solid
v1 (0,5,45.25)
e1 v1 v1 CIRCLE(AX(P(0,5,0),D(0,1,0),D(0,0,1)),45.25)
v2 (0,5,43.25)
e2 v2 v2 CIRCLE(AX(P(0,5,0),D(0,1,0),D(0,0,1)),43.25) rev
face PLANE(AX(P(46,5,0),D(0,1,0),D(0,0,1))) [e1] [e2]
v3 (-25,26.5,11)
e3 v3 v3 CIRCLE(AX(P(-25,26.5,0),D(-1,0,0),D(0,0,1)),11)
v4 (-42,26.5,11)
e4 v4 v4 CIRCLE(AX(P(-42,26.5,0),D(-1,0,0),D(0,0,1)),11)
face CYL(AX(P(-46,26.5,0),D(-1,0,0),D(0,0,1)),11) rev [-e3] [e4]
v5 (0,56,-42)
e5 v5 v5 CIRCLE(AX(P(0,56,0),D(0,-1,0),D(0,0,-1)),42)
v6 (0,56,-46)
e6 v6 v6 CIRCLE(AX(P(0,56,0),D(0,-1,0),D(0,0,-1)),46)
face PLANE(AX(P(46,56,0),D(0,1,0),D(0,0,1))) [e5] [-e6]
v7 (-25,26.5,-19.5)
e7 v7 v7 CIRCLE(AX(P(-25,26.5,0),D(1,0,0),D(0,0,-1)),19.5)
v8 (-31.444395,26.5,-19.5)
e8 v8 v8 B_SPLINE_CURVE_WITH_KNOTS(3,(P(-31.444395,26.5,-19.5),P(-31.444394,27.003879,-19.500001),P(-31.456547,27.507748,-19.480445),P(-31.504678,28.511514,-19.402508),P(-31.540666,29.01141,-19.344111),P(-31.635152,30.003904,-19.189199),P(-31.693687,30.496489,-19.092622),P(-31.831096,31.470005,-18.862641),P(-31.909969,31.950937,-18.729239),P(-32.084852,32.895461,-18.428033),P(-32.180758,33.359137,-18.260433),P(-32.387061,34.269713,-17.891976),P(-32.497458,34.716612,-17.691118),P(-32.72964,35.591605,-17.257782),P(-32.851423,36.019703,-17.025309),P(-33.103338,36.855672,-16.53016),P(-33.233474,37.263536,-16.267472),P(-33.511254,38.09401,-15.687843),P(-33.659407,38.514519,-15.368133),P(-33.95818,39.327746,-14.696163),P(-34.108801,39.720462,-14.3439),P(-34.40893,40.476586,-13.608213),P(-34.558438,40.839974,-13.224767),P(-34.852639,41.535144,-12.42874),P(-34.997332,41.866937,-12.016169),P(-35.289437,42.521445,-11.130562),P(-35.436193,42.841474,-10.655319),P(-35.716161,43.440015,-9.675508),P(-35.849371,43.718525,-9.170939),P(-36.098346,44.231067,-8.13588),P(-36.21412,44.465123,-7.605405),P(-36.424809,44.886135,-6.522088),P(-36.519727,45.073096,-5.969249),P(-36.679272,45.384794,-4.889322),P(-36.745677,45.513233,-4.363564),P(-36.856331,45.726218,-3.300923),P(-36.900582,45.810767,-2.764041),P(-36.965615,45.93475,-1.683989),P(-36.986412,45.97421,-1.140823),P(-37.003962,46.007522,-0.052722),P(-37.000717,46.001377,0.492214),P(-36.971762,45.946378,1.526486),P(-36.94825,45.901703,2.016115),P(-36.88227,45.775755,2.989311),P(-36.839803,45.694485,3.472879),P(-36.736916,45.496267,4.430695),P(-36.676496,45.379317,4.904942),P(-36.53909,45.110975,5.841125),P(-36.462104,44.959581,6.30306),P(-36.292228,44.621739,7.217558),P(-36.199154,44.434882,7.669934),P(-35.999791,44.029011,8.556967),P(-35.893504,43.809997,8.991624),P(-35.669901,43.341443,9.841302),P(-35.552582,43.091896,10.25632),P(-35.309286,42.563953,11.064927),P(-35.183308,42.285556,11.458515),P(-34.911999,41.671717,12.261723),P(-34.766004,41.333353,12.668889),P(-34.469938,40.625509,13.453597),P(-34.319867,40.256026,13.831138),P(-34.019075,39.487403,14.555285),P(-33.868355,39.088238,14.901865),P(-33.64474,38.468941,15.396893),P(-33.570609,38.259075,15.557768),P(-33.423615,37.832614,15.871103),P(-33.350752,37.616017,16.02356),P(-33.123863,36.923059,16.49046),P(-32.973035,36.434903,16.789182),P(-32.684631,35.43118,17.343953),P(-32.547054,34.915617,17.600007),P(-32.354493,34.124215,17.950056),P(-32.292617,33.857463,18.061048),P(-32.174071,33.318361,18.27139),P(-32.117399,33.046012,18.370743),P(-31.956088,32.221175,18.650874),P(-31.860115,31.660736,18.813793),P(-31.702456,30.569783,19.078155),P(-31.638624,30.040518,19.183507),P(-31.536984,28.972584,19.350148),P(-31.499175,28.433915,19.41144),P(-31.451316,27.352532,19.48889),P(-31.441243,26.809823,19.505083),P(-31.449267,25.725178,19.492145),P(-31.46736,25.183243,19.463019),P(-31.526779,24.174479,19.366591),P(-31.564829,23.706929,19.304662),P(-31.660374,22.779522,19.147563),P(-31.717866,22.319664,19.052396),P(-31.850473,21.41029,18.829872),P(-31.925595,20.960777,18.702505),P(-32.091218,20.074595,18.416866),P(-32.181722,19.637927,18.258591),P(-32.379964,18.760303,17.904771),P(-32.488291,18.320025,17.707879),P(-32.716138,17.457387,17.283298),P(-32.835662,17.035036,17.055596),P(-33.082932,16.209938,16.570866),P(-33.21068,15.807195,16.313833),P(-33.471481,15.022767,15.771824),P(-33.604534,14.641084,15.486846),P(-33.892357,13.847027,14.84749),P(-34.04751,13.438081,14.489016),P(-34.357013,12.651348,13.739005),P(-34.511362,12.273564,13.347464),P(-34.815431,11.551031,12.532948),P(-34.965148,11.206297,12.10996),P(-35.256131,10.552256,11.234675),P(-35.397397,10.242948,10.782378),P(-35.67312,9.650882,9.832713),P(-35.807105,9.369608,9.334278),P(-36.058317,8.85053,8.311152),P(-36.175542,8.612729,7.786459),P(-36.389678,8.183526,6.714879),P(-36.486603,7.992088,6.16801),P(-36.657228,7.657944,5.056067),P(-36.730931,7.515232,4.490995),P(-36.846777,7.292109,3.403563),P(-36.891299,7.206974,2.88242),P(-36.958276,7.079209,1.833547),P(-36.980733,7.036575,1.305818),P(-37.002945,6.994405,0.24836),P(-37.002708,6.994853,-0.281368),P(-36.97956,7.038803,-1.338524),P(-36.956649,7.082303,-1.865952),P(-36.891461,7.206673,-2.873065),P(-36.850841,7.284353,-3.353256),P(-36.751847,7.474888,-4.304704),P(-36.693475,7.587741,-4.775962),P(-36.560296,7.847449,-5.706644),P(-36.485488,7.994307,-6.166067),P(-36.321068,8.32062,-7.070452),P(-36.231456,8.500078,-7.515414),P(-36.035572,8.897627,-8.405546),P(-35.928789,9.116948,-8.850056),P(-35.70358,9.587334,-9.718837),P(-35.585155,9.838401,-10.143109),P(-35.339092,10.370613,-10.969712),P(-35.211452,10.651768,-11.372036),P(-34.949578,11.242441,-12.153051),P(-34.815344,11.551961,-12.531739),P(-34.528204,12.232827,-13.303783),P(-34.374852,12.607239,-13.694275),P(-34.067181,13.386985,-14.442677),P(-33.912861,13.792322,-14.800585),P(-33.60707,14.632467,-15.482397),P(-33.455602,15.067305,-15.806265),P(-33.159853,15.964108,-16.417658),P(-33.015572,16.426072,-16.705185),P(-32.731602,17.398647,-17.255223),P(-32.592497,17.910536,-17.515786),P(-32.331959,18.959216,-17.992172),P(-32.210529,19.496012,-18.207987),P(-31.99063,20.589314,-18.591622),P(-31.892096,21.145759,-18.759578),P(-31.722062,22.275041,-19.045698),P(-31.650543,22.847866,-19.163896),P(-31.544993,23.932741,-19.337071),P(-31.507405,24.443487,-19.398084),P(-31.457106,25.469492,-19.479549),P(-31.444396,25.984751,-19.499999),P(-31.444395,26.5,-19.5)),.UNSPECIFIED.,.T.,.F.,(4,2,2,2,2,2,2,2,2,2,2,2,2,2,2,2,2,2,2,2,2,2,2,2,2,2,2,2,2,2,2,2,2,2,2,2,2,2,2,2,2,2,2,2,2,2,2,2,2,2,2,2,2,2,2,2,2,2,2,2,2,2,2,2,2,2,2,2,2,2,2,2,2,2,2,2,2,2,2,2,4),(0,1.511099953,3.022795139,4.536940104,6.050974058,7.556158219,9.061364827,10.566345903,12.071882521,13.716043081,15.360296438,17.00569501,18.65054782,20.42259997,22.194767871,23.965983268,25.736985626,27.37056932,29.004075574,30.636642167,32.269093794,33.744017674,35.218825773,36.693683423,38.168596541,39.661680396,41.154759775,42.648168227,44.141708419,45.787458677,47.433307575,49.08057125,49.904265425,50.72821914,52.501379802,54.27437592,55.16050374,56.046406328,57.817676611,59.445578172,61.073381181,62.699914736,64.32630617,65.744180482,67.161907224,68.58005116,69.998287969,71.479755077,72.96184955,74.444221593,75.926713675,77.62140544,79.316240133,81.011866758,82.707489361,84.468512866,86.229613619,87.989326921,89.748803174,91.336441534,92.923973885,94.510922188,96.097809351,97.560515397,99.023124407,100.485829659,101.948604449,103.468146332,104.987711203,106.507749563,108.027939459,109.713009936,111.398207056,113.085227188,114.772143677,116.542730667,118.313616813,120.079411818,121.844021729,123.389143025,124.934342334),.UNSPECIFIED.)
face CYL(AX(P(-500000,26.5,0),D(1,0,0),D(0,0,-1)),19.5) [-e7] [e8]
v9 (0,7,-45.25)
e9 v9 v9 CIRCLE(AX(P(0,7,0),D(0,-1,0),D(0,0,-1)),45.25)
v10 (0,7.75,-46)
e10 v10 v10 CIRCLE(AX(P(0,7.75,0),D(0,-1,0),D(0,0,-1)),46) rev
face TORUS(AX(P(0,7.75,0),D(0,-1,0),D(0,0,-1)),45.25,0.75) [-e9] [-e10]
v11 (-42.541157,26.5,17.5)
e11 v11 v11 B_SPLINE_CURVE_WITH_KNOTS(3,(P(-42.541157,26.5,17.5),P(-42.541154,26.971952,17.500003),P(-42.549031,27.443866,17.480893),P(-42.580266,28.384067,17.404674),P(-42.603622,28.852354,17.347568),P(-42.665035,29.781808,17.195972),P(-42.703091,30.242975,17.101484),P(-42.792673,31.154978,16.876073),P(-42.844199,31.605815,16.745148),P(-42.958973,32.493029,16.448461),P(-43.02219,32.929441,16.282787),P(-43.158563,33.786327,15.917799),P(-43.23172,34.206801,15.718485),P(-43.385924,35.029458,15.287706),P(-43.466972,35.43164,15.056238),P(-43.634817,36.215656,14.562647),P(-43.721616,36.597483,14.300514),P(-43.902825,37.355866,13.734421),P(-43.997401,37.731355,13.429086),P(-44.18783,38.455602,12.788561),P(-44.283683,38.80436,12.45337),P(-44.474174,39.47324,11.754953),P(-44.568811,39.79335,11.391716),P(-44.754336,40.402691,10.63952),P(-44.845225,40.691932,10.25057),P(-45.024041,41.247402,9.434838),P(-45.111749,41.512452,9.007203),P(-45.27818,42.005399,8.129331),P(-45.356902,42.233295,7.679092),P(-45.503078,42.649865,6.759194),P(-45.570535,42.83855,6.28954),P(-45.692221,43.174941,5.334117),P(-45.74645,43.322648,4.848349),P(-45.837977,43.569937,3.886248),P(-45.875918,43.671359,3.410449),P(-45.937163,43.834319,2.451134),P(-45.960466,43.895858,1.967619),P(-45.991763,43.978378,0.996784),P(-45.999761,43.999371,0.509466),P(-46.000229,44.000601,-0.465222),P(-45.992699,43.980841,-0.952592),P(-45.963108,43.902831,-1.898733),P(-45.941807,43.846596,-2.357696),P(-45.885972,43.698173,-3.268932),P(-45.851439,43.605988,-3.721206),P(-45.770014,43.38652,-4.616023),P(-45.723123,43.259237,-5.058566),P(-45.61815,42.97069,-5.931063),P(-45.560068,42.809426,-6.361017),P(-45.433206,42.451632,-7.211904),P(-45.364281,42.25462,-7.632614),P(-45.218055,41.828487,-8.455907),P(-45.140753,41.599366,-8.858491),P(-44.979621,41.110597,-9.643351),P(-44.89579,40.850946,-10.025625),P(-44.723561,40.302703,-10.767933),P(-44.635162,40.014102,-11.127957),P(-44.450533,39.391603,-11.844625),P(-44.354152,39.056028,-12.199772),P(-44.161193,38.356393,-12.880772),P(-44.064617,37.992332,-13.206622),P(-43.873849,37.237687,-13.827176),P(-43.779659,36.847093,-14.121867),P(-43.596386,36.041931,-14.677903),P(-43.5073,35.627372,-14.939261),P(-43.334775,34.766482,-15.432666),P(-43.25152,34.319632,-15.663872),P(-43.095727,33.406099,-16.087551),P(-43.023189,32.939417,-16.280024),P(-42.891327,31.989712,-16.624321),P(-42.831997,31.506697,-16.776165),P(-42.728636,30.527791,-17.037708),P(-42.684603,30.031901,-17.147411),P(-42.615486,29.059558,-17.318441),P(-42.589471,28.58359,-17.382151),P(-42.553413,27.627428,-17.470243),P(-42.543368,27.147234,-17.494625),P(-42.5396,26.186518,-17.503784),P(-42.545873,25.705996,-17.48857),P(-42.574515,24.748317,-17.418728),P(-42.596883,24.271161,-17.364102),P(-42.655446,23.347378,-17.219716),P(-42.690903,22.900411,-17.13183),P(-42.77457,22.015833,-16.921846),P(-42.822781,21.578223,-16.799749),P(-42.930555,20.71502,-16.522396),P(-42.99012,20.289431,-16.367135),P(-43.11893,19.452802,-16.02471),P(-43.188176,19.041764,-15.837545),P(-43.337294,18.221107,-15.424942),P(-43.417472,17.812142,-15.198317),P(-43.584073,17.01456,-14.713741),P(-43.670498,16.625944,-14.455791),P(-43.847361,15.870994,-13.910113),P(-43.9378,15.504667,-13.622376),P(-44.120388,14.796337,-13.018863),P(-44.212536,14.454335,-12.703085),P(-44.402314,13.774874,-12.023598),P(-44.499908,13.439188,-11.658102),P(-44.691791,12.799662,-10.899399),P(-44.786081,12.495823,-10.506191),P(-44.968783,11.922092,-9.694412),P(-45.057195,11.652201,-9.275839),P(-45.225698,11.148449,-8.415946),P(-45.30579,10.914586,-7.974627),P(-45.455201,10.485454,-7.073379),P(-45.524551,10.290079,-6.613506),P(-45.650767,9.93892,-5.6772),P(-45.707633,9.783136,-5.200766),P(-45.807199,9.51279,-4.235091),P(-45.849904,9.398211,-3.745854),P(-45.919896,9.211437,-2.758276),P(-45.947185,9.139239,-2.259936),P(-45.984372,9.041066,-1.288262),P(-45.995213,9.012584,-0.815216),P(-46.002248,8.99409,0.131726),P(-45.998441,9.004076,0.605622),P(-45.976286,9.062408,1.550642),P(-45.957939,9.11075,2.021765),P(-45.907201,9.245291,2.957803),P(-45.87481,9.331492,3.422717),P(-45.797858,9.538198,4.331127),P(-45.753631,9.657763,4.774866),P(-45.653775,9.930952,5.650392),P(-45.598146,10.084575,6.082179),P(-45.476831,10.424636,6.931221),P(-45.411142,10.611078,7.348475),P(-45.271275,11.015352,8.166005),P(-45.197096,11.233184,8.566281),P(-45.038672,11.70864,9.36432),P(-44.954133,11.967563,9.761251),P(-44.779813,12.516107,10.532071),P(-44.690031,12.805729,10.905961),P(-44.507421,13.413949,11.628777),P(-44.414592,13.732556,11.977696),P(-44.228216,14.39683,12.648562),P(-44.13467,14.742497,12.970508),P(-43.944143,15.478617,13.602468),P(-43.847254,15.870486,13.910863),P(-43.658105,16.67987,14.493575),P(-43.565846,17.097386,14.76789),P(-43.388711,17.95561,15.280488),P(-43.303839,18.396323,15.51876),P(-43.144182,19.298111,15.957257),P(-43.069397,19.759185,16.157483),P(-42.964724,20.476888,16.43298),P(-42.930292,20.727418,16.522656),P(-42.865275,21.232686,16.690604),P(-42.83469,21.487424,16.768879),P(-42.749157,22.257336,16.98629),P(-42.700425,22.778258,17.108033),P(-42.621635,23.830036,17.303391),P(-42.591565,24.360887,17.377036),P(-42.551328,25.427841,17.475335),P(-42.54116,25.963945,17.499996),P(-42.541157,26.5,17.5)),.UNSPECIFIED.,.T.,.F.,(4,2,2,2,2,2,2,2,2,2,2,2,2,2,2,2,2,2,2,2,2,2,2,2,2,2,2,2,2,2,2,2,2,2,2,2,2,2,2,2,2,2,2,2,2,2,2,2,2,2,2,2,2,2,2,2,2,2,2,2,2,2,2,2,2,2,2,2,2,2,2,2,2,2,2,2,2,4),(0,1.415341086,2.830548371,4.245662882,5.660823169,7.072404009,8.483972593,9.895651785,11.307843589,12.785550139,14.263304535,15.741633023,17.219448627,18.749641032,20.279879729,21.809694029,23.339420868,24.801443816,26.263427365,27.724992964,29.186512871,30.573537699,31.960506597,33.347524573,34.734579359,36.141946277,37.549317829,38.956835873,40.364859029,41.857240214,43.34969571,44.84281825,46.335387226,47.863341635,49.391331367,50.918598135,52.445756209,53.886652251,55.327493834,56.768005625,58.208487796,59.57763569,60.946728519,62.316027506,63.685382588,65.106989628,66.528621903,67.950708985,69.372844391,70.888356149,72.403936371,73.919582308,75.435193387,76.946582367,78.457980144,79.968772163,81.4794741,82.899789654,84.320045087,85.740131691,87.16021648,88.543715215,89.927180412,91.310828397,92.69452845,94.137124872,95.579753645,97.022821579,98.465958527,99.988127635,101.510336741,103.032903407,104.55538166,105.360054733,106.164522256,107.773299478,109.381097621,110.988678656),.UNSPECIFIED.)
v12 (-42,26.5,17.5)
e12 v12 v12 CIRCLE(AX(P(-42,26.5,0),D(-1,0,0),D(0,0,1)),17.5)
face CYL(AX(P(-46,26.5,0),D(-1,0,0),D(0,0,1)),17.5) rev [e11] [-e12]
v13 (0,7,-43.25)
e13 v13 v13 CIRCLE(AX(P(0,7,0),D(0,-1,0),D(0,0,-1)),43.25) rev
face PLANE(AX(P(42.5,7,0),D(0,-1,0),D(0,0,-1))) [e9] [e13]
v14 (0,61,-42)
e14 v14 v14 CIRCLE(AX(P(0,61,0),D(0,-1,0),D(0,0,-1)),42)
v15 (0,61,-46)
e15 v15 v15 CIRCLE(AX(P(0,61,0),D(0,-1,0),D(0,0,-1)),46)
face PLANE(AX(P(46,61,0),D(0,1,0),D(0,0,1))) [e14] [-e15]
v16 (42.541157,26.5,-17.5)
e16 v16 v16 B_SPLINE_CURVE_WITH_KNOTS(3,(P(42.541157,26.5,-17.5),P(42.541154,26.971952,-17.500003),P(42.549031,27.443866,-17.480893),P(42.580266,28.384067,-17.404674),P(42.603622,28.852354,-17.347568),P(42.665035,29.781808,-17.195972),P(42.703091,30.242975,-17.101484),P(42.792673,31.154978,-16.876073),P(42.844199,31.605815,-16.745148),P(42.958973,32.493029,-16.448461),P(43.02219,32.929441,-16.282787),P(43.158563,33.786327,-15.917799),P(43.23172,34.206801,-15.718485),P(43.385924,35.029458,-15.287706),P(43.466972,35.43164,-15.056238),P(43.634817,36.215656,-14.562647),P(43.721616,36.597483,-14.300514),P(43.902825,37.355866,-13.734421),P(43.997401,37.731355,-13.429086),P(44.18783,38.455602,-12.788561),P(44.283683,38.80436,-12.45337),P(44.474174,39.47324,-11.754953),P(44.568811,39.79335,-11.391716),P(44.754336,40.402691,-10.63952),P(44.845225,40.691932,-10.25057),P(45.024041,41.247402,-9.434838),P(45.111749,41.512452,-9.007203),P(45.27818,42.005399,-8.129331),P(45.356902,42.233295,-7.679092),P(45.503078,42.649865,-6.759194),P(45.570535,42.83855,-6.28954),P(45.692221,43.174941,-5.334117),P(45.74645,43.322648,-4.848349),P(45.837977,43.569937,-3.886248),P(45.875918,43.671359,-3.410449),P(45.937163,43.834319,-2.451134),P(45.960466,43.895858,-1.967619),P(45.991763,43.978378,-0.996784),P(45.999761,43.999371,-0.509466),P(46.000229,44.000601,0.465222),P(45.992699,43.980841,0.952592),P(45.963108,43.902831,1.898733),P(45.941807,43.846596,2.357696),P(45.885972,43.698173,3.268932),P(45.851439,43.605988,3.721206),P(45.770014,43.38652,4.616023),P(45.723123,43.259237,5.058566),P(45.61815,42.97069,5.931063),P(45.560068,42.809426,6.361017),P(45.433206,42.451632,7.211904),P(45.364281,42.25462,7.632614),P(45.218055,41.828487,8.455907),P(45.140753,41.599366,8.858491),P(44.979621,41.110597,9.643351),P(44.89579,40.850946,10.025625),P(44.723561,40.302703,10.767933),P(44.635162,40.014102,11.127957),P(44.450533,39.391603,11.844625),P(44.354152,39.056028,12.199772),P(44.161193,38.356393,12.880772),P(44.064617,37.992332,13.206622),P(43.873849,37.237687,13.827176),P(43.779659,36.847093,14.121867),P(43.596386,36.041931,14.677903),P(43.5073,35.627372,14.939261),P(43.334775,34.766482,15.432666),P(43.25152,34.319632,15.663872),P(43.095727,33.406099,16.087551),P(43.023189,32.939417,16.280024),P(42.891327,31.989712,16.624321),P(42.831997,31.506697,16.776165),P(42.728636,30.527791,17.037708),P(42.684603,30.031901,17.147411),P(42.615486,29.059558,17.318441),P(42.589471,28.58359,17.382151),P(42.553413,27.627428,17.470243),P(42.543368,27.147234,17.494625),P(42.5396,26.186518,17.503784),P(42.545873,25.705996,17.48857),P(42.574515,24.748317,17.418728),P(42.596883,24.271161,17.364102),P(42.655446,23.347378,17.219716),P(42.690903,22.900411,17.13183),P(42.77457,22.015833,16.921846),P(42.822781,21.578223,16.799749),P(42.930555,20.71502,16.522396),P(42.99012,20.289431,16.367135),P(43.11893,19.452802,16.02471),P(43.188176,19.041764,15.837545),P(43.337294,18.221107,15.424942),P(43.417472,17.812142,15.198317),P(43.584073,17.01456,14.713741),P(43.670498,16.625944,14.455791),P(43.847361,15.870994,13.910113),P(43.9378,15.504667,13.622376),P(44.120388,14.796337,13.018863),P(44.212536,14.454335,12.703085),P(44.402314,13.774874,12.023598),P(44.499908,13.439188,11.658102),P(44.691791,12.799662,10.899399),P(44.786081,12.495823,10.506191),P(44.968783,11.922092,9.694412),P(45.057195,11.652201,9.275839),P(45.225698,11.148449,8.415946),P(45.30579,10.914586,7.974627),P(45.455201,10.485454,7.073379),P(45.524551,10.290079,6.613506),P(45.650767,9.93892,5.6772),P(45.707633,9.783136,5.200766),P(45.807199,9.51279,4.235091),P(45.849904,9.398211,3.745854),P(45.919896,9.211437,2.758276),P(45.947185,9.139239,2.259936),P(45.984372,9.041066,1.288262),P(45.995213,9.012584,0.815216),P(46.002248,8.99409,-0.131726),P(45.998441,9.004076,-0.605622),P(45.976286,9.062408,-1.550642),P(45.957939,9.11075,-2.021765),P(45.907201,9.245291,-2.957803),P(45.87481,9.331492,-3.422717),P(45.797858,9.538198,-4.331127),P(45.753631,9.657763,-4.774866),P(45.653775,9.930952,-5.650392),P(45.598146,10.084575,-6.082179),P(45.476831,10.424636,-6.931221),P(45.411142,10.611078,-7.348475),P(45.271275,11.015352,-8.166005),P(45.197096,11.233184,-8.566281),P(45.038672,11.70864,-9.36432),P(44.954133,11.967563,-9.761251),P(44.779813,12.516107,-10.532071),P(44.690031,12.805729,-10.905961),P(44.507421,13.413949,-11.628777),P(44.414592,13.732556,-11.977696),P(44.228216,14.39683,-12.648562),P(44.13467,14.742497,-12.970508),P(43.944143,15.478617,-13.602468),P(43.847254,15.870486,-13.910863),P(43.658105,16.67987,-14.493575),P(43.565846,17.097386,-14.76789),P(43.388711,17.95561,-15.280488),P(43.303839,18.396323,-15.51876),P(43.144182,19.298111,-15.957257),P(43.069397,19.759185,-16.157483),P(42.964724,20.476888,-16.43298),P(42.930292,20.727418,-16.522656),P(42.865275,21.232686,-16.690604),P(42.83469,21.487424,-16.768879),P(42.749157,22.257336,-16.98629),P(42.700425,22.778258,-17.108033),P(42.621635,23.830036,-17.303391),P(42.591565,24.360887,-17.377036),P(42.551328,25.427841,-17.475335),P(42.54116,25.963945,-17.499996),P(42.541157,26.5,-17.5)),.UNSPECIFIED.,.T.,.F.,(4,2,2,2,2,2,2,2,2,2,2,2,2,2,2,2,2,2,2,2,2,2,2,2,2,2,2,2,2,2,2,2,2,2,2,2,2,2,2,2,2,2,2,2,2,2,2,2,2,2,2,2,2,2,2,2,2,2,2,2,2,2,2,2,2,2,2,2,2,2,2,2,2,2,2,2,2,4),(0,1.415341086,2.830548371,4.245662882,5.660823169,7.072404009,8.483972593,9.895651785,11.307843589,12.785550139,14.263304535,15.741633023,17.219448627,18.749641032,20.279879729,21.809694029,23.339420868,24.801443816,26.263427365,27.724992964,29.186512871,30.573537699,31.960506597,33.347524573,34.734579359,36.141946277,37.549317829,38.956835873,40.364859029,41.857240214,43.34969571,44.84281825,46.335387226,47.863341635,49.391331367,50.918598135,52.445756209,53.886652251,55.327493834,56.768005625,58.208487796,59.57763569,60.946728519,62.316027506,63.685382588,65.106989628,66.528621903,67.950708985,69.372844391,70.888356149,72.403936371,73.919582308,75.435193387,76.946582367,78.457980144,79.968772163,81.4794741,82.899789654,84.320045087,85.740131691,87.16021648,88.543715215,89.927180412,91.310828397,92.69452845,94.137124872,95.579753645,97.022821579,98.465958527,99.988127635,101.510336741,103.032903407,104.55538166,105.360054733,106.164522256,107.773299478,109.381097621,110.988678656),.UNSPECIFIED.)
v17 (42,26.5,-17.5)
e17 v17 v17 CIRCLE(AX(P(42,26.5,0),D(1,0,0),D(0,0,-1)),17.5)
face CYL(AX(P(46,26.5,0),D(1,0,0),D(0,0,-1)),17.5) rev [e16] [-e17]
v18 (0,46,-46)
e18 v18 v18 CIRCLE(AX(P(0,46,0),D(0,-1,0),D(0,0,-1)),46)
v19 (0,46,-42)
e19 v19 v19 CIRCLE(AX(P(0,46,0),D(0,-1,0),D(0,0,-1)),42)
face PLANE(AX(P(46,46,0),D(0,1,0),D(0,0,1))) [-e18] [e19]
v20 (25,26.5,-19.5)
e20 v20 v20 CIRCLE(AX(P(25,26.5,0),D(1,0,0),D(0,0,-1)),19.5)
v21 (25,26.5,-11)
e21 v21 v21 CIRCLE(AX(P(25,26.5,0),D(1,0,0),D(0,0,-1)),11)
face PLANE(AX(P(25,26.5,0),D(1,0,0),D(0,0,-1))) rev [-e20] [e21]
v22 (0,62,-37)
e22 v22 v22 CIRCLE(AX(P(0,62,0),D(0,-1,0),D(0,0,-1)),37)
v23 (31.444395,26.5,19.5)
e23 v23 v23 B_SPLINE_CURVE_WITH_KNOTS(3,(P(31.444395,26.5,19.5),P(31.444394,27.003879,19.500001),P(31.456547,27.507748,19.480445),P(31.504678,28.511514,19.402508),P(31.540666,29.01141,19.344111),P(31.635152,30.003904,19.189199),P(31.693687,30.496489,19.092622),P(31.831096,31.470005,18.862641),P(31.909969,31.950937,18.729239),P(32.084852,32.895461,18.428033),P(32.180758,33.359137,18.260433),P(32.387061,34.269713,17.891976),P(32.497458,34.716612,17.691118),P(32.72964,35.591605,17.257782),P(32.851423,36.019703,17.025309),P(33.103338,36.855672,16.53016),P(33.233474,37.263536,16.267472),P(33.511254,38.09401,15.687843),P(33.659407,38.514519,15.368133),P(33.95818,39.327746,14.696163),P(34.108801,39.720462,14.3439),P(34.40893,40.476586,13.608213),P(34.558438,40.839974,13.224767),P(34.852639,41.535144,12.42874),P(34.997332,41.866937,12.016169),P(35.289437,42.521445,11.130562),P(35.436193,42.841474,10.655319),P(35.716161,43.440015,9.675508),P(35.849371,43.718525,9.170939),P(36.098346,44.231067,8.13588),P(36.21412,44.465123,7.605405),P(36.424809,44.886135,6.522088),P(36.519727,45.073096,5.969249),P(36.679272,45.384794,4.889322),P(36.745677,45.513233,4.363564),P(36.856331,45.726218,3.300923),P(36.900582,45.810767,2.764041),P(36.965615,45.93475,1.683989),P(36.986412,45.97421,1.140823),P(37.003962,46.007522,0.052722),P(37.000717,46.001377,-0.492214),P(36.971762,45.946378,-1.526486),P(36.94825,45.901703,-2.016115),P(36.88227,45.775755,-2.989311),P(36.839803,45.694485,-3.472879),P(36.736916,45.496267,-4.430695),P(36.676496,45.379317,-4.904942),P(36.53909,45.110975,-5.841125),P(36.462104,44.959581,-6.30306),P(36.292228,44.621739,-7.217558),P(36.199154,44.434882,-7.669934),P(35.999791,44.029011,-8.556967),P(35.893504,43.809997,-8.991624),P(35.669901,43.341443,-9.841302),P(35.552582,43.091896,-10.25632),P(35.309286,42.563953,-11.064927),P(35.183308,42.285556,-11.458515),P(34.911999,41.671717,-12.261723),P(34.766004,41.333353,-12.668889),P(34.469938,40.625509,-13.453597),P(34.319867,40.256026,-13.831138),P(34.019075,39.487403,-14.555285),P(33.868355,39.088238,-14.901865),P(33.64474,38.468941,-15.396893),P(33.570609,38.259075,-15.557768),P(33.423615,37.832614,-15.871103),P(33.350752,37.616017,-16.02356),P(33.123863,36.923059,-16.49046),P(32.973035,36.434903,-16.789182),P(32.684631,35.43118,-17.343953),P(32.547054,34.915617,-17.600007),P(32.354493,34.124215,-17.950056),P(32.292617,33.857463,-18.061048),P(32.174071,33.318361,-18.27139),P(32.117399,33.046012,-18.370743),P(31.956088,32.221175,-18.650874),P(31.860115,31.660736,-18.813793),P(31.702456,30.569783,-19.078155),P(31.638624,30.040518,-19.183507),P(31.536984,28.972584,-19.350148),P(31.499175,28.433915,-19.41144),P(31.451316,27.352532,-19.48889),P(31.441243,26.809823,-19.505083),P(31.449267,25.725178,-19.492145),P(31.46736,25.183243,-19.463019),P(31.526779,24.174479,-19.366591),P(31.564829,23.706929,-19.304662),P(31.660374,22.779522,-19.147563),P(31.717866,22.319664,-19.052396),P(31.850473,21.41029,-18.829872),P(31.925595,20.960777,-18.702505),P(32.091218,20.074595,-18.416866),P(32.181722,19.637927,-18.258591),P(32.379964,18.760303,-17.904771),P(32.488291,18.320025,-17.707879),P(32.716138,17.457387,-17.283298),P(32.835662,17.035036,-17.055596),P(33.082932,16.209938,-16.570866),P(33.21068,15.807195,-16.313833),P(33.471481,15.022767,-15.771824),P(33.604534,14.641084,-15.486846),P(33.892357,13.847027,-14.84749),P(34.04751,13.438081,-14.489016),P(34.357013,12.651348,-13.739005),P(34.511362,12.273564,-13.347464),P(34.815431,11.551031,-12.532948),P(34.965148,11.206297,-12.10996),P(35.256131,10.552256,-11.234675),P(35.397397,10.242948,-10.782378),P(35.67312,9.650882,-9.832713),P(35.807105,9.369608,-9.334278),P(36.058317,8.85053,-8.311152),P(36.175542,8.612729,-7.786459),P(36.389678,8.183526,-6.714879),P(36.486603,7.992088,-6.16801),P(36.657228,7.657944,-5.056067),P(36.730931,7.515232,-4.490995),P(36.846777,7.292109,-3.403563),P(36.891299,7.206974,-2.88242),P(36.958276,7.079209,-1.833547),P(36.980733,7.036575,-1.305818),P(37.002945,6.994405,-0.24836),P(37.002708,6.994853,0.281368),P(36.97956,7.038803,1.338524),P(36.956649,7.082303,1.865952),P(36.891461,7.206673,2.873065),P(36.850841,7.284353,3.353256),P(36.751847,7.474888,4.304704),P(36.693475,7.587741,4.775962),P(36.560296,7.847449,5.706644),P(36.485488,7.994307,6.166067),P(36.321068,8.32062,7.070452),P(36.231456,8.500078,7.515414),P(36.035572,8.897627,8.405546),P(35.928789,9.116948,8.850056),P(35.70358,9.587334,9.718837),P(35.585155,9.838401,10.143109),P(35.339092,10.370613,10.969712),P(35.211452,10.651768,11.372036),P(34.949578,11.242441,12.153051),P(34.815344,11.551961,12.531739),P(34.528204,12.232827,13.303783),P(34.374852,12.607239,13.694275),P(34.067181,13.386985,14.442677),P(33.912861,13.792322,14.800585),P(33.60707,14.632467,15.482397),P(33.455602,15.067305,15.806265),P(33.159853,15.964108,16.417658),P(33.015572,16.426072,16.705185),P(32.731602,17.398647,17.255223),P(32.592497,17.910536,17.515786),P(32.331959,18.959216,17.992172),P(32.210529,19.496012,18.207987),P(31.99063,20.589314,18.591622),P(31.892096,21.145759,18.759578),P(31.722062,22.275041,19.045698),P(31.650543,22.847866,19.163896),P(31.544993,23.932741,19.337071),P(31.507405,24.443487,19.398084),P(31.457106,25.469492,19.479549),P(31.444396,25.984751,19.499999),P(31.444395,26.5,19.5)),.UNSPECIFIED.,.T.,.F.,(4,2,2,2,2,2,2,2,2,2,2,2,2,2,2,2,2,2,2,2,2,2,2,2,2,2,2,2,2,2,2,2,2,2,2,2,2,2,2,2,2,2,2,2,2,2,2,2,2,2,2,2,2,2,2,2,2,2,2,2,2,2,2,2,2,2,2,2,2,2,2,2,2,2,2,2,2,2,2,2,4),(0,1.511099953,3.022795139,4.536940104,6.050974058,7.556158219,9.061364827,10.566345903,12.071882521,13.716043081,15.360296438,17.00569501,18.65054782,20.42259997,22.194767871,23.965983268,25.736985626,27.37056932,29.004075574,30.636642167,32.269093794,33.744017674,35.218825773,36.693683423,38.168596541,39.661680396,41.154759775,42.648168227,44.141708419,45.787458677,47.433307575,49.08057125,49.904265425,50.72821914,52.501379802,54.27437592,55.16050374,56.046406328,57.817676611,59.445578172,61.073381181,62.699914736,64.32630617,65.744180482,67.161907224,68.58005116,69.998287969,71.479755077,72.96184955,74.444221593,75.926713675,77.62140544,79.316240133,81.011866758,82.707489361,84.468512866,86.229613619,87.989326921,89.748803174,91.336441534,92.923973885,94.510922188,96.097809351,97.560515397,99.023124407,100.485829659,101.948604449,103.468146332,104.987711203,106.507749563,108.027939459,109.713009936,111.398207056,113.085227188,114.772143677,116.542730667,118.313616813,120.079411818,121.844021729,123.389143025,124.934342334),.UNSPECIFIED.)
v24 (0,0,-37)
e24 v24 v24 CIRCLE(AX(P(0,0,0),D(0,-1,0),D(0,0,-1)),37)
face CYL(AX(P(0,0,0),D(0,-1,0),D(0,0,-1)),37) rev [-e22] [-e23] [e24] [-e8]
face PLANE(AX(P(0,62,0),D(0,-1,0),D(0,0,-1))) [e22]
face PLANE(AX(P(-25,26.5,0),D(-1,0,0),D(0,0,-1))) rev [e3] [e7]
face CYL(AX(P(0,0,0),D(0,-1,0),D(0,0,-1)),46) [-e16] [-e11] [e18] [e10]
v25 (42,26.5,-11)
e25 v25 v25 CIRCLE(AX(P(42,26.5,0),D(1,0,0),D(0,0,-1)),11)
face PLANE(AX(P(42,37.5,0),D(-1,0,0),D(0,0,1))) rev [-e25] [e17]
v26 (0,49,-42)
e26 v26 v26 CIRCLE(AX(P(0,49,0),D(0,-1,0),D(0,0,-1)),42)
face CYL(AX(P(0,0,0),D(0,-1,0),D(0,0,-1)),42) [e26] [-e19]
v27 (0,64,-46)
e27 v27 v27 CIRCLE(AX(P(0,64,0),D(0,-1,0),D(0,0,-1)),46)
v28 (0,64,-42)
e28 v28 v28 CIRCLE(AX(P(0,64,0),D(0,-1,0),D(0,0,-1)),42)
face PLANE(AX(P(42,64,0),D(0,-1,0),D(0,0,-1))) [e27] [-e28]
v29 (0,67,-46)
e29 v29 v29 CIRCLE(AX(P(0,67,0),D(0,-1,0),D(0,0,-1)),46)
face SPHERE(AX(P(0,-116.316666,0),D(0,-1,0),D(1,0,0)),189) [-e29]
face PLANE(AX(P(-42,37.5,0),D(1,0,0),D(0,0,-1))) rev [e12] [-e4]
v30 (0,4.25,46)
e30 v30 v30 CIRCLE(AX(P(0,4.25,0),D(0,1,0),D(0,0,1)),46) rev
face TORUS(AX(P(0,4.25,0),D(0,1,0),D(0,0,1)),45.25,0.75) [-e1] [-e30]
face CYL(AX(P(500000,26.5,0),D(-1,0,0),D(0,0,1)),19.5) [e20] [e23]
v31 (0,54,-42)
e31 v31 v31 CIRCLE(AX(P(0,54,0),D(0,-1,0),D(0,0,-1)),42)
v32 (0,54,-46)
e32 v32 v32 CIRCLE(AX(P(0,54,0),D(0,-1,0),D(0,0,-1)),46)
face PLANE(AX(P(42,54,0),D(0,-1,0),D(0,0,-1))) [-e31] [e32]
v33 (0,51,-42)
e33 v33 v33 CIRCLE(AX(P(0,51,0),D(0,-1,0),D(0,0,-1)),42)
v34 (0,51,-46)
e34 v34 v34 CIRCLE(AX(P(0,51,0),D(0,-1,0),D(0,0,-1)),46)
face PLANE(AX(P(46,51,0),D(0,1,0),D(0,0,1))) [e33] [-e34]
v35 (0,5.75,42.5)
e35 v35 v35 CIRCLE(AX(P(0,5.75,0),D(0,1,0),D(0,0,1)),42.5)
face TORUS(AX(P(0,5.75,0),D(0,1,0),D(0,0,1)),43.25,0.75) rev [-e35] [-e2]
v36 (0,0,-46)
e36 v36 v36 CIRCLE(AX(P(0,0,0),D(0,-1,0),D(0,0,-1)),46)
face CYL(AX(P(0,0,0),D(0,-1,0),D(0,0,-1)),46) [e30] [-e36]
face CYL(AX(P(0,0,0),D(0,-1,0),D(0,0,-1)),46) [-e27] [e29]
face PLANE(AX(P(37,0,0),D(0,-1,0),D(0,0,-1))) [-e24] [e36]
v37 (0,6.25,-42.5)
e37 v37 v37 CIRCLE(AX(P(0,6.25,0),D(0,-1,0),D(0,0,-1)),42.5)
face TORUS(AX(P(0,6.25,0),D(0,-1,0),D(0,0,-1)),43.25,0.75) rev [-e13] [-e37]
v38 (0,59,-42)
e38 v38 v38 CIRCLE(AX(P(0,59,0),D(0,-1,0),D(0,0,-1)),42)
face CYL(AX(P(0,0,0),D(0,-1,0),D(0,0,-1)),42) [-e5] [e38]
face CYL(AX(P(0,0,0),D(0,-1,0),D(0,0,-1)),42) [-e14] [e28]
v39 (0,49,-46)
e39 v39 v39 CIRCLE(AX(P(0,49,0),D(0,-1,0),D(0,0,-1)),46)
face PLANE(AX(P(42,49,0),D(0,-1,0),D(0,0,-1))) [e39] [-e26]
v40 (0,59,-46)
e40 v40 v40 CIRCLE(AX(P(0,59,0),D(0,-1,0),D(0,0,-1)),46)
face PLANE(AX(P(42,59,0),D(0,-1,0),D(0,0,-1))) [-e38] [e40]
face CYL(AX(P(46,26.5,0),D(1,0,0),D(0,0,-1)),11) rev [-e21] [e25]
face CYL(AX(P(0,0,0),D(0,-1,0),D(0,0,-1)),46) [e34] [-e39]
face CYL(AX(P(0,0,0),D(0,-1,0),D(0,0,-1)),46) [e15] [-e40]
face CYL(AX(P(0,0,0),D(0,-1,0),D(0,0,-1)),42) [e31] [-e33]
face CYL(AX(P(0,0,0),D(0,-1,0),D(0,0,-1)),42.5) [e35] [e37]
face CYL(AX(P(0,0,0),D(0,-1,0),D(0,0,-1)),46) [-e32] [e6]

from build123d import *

# Parameters (mm, degrees)
BOSS_EXTRUDE1_REACH                       = 124.544
BOSS_EXTRUDE1_END_RADIUS                  = 37
BOSS_EXTRUDE1_START                       = 25
SKETCH5_R                                 = 19.5
CBORE_START                               = 25
CBORE_FOR_M5_HEX_HEAD_BOLT2_OUTLINE_R     = 11
CBORE_FOR_M5_HEX_HEAD_BOLT2_DEPTH         = 21.000000075
CBORE_START_2                             = 42
CBORE_FOR_M5_HEX_HEAD_BOLT2_2_OUTLINE_R   = 17.5
CBORE_FOR_M5_HEX_HEAD_BOLT2_2_OUTLINE_R_2 = 11
CBORE_FOR_M5_HEX_HEAD_BOLT2_2_DEPTH       = 4.000000075
FILLET1_R                                 = 0.75


# Read off the part's stored shape, not the designer's step: CBORE for M5 Hex Head Bolt2
with BuildPart() as part:
    # Sketch1 → Revolve1 (revolve)
    with BuildSketch(Plane.XY, mode=Mode.PRIVATE) as revolve1_sk:
        with BuildLine():
            Line((0, 72.683334091), (0, 62))
            Line((0, 62), (37, 62))
            Line((37, 62), (37, 0))
            Line((37, 0), (46, 0))
            Line((46, 0), (46, 5))
            Line((46, 5), (42.5, 5))
            Line((42.5, 5), (42.5, 7))
            Line((42.5, 7), (46, 7))
            Line((46, 7), (46, 46))
            Line((46, 46), (42, 46))
            Line((42, 46), (42, 49))
            Line((42, 49), (46, 49))
            Line((46, 49), (46, 51))
            Line((46, 51), (42, 51))
            Line((42, 51), (42, 54))
            Line((42, 54), (46, 54))
            Line((46, 54), (46, 56))
            Line((46, 56), (42, 56))
            Line((42, 56), (42, 59))
            Line((42, 59), (46, 59))
            Line((46, 59), (46, 61))
            Line((46, 61), (42, 61))
            Line((42, 61), (42, 64))
            Line((42, 64), (46, 64))
            Line((46, 64), (46, 67))
            ThreePointArc((46, 67), (23.174880185, 71.257119382), (0, 72.683334091))
        make_face()
    revolve(revolve1_sk.sketch.rotate(Axis((0, 0, 0), (0, 1, 0)), 90), axis=Axis((0, 0, 0), (0, 1, 0)))

    # Boss-Extrude1: up to this cylinder (the profile starts inside it)
    boss_extrude1_end = Plane(origin=(0, 26.5, 0), z_dir=(0, -1, 0)) * Cylinder(BOSS_EXTRUDE1_END_RADIUS, 324.088, mode=Mode.PRIVATE)
    # Sketch5 → Boss-Extrude1 (add, up to the surface)
    with BuildSketch(Plane(origin=(0, 0, 0), x_dir=(0, 0, -1), z_dir=(1, 0, 0)).offset(BOSS_EXTRUDE1_START), mode=Mode.PRIVATE) as boss_extrude1_sk1:
        with Locations(Location((0, 26.5, 0), (0, 0, 180))):
            Circle(SKETCH5_R)
    boss_extrude1_tool1 = extrude(boss_extrude1_sk1.sketch, amount=BOSS_EXTRUDE1_REACH, mode=Mode.PRIVATE) & boss_extrude1_end
    boss_extrude1 = boss_extrude1_tool1.solids().sort_by_distance((25, 26.5, 0))[0]
    add(boss_extrude1)

    # CBORE for M5 Hex Head Bolt2 outline → CBORE for M5 Hex Head Bolt2 (cut)
    with BuildSketch(Plane.YZ.offset(CBORE_START)):
        with Locations((26.5, 0)):
            Circle(CBORE_FOR_M5_HEX_HEAD_BOLT2_OUTLINE_R)
    cbore_for_m5_hex_head_bolt2 = extrude(amount=CBORE_FOR_M5_HEX_HEAD_BOLT2_DEPTH, mode=Mode.SUBTRACT)

    # CBORE for M5 Hex Head Bolt2 2 outline → CBORE for M5 Hex Head Bolt2 2 (cut)
    with BuildSketch(Plane.YZ.offset(CBORE_START_2)):
        with Locations((26.5, 0)):
            Circle(CBORE_FOR_M5_HEX_HEAD_BOLT2_2_OUTLINE_R)
        with Locations((26.5, 0)):
            Circle(CBORE_FOR_M5_HEX_HEAD_BOLT2_2_OUTLINE_R_2, mode=Mode.SUBTRACT)
    cbore_for_m5_hex_head_bolt2_2 = extrude(amount=CBORE_FOR_M5_HEX_HEAD_BOLT2_2_DEPTH, mode=Mode.SUBTRACT)

    # Mirror1: Boss-Extrude1, CBORE for M5 Hex Head Bolt2, CBORE for M5 Hex Head Bolt2 2 across plane
    add(boss_extrude1.mirror(Plane(origin=(0, 0, 0), x_dir=(0, 0, 1), z_dir=(1, 0, 0))))
    add(cbore_for_m5_hex_head_bolt2.mirror(Plane(origin=(0, 0, 0), x_dir=(0, 0, 1), z_dir=(1, 0, 0))), mode=Mode.SUBTRACT)
    add(cbore_for_m5_hex_head_bolt2_2.mirror(Plane(origin=(0, 0, 0), x_dir=(0, 0, 1), z_dir=(1, 0, 0))), mode=Mode.SUBTRACT)

    # Fillet1
    fillet1_edges = [part.edges().sort_by_distance(p)[0] for p in [
        (0, 7, 46),
        (0, 7, 42.5),
        (0, 5, 42.5),
        (0, 5, 46),
    ]]
    fillet(fillet1_edges, radius=FILLET1_R)


solid = part.part
